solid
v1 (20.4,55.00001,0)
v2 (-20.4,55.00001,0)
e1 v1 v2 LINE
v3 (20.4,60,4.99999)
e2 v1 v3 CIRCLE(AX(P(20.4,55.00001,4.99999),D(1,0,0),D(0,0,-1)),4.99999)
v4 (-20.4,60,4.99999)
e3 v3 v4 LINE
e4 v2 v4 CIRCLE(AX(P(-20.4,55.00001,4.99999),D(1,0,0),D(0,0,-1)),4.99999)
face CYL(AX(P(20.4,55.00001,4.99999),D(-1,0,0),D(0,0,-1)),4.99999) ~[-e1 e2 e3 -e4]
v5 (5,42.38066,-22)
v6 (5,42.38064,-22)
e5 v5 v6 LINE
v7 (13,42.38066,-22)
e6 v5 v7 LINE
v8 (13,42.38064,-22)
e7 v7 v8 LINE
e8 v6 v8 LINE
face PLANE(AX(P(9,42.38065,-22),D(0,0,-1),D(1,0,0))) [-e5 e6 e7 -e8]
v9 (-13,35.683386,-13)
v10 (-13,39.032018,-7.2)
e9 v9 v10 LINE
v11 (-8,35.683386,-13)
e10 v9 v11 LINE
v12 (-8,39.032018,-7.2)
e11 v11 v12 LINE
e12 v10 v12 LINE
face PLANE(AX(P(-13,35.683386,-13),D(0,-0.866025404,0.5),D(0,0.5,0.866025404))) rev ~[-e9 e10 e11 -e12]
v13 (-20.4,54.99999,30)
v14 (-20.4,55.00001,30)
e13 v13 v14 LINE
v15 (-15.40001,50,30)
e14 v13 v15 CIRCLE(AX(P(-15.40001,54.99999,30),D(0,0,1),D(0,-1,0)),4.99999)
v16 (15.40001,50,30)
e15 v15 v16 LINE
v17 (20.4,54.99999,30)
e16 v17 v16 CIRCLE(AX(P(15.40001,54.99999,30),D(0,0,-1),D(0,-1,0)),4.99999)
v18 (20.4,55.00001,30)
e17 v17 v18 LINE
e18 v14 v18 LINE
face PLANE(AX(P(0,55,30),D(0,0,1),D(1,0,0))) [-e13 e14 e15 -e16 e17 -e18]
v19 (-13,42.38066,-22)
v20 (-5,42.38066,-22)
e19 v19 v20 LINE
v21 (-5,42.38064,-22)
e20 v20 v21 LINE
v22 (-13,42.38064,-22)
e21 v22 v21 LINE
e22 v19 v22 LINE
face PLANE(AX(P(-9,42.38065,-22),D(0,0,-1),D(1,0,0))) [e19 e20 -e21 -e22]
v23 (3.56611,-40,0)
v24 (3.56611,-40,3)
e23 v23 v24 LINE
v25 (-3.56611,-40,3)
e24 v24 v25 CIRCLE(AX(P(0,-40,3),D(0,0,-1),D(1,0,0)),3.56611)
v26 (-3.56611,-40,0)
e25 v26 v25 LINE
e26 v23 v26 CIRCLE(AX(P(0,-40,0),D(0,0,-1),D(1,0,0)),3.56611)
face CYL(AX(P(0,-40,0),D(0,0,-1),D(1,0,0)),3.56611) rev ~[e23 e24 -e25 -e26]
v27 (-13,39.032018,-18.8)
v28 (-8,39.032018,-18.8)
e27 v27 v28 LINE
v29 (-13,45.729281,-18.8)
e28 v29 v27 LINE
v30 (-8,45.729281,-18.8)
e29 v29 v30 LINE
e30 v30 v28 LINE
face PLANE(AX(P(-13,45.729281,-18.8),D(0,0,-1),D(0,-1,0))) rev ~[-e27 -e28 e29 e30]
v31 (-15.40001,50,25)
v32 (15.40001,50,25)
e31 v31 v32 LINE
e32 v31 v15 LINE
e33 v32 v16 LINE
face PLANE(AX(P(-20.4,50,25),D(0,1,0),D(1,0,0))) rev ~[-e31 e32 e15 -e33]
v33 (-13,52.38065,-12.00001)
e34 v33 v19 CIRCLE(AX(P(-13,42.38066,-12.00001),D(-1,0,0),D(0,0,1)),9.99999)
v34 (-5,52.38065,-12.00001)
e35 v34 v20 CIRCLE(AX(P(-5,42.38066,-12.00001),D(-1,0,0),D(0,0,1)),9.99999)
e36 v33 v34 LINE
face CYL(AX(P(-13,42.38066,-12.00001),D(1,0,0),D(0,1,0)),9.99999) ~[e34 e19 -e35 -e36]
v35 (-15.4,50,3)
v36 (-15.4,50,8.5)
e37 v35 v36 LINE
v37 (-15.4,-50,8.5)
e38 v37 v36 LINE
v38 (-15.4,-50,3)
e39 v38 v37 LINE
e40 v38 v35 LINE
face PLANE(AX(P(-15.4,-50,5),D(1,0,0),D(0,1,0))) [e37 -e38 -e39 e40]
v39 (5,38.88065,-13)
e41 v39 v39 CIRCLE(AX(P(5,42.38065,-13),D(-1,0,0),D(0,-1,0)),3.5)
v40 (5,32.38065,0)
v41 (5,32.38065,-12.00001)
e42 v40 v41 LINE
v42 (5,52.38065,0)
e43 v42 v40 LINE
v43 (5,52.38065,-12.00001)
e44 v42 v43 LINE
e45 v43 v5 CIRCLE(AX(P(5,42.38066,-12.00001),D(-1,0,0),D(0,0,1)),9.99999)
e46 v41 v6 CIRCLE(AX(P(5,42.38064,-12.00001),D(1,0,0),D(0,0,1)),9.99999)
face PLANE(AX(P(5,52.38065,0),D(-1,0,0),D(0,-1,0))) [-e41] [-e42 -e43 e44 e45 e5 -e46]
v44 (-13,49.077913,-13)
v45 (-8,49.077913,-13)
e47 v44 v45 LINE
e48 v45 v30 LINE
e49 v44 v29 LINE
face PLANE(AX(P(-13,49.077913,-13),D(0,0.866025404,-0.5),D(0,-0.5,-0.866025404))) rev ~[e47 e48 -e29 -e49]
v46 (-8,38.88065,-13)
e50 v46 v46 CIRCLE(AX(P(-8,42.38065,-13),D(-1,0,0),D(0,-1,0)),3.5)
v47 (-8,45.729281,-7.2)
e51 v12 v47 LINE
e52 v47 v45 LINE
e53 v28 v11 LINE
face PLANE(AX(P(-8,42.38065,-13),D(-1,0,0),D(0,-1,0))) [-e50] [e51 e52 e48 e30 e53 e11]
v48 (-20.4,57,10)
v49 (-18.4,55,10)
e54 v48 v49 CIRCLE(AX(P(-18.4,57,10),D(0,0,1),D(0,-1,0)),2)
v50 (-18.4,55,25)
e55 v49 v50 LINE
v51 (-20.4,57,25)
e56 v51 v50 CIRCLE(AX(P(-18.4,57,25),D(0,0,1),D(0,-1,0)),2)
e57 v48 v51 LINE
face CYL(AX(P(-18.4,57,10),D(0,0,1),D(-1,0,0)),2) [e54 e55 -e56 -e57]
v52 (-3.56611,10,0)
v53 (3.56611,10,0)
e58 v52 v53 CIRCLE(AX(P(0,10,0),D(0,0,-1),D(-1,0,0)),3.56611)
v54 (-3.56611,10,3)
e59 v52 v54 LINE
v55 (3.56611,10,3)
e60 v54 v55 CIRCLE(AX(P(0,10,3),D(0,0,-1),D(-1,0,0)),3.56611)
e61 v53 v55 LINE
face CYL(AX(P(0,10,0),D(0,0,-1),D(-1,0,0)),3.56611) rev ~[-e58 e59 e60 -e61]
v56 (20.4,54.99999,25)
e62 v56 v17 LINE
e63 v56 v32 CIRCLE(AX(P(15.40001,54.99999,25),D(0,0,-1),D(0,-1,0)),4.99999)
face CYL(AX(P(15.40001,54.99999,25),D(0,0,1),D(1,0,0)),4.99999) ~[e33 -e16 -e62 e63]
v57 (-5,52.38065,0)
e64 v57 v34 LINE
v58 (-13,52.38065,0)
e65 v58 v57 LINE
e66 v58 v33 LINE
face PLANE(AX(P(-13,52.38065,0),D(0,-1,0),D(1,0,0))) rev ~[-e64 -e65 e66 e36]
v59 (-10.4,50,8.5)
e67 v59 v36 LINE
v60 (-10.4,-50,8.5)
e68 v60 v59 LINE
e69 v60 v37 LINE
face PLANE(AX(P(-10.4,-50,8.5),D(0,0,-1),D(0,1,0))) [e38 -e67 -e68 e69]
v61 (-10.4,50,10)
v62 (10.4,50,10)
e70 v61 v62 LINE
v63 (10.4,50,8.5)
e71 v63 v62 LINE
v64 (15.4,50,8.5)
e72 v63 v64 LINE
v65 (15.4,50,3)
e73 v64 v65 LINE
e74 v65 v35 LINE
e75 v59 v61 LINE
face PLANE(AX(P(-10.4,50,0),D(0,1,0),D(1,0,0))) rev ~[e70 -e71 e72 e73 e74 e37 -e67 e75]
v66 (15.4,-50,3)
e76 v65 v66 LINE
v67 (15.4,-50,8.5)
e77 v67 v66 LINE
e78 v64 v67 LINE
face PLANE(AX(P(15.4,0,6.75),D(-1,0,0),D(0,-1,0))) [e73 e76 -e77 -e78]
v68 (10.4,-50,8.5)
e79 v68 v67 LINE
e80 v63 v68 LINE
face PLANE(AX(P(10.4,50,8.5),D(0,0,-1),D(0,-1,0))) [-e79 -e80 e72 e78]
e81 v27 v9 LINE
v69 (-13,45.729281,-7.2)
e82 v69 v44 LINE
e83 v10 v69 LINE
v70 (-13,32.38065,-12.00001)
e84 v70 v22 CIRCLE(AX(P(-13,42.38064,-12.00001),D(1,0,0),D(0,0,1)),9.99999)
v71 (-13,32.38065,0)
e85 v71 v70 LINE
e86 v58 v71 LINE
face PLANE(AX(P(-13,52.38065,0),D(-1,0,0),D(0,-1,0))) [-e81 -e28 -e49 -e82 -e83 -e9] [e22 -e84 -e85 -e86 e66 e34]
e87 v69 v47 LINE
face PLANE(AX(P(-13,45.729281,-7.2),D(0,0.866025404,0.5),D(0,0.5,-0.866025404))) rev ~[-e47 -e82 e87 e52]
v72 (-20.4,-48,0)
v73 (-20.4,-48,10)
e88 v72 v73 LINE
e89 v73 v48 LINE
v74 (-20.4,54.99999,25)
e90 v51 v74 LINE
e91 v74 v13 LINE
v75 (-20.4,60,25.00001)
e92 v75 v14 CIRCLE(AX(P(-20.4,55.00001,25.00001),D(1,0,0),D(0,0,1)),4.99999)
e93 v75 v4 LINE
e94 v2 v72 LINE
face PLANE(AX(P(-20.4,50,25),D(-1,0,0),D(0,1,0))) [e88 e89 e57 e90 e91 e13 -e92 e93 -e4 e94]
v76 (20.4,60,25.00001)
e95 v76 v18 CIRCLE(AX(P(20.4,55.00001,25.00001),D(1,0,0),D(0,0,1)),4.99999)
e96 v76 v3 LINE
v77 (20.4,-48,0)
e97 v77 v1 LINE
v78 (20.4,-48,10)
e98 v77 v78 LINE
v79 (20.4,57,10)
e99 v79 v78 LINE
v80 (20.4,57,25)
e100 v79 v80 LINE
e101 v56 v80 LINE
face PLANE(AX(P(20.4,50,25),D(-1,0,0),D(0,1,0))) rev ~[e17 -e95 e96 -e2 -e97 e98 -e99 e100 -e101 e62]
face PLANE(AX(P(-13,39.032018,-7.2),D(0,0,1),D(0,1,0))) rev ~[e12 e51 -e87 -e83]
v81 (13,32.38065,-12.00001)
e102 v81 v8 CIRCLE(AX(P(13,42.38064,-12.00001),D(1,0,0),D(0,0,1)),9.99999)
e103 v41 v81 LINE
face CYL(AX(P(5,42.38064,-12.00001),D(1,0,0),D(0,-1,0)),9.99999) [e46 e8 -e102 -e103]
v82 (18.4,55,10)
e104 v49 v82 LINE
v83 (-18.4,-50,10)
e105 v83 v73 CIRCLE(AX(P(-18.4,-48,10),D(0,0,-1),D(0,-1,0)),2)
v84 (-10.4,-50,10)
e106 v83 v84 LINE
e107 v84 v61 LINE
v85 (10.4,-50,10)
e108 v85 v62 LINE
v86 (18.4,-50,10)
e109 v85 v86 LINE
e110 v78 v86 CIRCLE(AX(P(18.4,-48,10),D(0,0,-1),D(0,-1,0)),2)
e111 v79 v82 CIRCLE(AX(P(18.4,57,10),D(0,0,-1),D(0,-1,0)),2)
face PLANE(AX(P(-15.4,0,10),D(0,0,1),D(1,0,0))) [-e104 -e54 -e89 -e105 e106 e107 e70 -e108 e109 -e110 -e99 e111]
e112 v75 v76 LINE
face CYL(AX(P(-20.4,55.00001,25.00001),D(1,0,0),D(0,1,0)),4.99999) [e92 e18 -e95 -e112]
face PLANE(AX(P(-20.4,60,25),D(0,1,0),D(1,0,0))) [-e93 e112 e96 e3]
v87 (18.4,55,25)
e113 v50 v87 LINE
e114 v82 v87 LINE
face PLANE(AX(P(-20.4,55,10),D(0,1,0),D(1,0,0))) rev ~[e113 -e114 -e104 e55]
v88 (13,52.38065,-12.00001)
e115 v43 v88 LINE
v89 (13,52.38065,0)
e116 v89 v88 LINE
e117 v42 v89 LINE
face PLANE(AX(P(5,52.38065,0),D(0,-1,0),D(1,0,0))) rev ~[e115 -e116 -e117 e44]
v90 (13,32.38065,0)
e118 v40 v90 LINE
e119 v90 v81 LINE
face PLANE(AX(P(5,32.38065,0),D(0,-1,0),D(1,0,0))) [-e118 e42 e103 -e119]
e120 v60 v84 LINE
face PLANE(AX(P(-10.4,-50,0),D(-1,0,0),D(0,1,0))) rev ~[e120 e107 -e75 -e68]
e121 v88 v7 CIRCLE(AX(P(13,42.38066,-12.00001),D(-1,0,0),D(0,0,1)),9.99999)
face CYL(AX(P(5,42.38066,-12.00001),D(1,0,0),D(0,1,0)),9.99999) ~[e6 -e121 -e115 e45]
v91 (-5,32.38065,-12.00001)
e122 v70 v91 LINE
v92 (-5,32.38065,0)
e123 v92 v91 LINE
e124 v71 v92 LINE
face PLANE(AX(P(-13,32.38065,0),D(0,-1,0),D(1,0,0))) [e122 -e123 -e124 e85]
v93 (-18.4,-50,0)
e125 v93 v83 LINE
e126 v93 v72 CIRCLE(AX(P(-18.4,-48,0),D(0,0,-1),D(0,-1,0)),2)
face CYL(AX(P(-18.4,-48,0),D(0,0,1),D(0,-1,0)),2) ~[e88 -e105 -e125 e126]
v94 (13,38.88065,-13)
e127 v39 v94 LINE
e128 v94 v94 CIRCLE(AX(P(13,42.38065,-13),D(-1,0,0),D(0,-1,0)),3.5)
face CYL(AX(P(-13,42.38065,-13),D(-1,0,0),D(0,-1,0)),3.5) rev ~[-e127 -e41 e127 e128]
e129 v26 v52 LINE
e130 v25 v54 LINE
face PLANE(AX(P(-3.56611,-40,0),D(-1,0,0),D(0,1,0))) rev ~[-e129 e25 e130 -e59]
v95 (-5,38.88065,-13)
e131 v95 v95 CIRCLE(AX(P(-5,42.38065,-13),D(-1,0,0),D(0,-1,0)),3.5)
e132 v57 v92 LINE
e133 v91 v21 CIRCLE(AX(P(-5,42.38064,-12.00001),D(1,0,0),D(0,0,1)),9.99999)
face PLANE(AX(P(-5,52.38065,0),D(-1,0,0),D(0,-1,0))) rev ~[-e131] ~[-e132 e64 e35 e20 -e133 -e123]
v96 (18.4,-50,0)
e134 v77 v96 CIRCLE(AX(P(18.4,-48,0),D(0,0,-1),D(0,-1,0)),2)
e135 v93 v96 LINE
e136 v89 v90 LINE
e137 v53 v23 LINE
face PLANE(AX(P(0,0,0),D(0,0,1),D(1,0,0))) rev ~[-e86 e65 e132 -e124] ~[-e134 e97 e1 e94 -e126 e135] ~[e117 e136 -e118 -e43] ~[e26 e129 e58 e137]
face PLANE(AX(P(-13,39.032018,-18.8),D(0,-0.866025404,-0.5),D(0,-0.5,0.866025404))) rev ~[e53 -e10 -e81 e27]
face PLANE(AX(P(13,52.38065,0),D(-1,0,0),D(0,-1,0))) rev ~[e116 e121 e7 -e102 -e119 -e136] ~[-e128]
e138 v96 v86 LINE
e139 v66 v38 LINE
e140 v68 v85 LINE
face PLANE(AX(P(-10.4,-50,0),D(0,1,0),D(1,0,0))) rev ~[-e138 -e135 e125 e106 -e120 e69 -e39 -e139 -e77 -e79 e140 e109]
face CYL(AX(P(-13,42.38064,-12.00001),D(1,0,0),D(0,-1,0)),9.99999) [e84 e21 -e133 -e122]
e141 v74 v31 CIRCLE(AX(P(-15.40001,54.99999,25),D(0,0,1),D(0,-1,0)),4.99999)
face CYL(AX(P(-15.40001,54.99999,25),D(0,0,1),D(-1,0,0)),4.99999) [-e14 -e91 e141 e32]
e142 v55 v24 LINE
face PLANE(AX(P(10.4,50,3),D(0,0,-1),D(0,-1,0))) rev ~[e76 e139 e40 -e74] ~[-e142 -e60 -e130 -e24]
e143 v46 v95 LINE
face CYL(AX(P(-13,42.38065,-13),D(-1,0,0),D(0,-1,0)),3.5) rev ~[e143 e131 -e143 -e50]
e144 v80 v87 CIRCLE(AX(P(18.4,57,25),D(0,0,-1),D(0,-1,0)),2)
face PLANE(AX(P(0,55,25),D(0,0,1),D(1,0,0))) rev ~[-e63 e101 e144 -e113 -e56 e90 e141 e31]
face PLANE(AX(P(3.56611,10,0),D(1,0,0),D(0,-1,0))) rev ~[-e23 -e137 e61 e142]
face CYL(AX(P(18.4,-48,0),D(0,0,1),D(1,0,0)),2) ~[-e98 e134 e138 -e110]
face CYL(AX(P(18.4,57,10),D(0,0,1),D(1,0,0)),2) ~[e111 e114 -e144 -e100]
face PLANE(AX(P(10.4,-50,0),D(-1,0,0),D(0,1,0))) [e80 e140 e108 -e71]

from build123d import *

# Parameters (mm, degrees)
F0_W      = 10
F0_H      = 100
F1_DEPTH  = 10
F0_W_2    = 20.8
F2_DEPTH  = 5
F3_W      = 40.8
F3_H      = 5
F4_DEPTH  = 15
F5_W      = 40.8
F5_H      = 10
F6_DEPTH  = 5
F7_W      = 8
F7_H      = 20
F8_DEPTH  = 22
F9_R      = 3.5
F10_DEPTH = 33.401
F11_DEPTH = 5
F12_R     = 9.99999
F13_R     = 4.99999
F14_R     = 2
F15_W     = 100
F15_H     = 3.5
F16_DEPTH = 5
F17_W     = 100
F17_H     = 3.5
F18_DEPTH = 5
F19_DEPTH = 2


# Not quite as in the source:
# - a fillet or chamfer is up to 0.001 mm smaller than in the source, because OpenCascade refuses the exact size


with BuildPart() as f1:
    # F0 (on Top) → F1 (new body)
    with BuildSketch(Plane.XY):
        with Locations((-15.4, 0)):
            Rectangle(F0_W, F0_H)
        Polygon((-10.4, 50), (10.4, 50), (20.4, 50), (20.4, 60), (-20.4, 60), (-20.4, 50), align=None)
        with Locations((15.4, 0)):
            Rectangle(F0_W, F0_H)
    extrude(amount=F1_DEPTH)

    # F0 (on Top) → F2 (join)
    with BuildSketch(Plane.XY):
        Rectangle(F0_W_2, F0_H)
        with BuildLine():
            Line((3.5661098082, 10), (3.5661098082, -40))
            ThreePointArc((3.5661098082, -40), (0, -43.5661098082), (-3.5661098082, -40))
            Line((-3.5661098082, -40), (-3.5661098082, 10))
            ThreePointArc((-3.5661098082, 10), (0, 13.5661098082), (3.5661098082, 10))
        make_face(mode=Mode.SUBTRACT)
    extrude(amount=F2_DEPTH)

    # F3 (on face) → F4 (join)
    with BuildSketch(Plane.XY.offset(10)):
        with Locations((0, 57.5)):
            Rectangle(F3_W, F3_H)
    extrude(amount=F4_DEPTH)

    # F5 (on face) → F6 (join)
    with BuildSketch(Plane.XY.offset(25)):
        with Locations((0, 55)):
            Rectangle(F5_W, F5_H)
    extrude(amount=F6_DEPTH)

    # F7 (on face) → F8 (join)
    with BuildSketch(Plane(origin=(0, 0, 0), x_dir=(1, 0, 0), z_dir=(0, 0, -1))):
        with Locations((9, -42.3806495965)):
            Rectangle(F7_W, F7_H)
        with Locations((-9, -42.3806495965)):
            Rectangle(F7_W, F7_H)
    extrude(amount=F8_DEPTH)

    # F9 (on face) → F10 (cut, through all)
    with BuildSketch(Plane(origin=(-13, 0, 0), x_dir=(0, -1, 0), z_dir=(-1, 0, 0))):
        with Locations((-42.3806495965, -13)):
            Circle(F9_R)
    extrude(amount=-F10_DEPTH, mode=Mode.SUBTRACT)

    # F9 (on face) → F11 (cut)
    with BuildSketch(Plane(origin=(-13, 0, 0), x_dir=(0, -1, 0), z_dir=(-1, 0, 0))):
        Polygon((-39.0320180352, -7.2), (-45.7292811578, -7.2), (-49.0779127191, -13), (-45.7292811578, -18.8), (-39.0320180352, -18.8), (-35.6833864739, -13), align=None)
        with Locations((-42.3806495965, -13)):
            Circle(F9_R, mode=Mode.SUBTRACT)
    extrude(amount=-F11_DEPTH, mode=Mode.SUBTRACT)

    # F12 (radius 10 in the source; OpenCascade refuses exactly that, so slightly less here)
    f12_edges = [f1.edges().sort_by_distance(p)[0] for p in [
        (-9, 52.38065, -22),
        (9, 52.38065, -22),
        (9, 32.38065, -22),
        (-9, 32.38065, -22),
    ]]
    fillet(f12_edges, radius=F12_R)

    # F13 (radius 5 in the source; OpenCascade refuses exactly that, so slightly less here)
    f13_edges = [f1.edges().sort_by_distance(p)[0] for p in [
        (-20.4, 50, 27.5),
        (20.4, 50, 27.5),
        (0, 60, 30),
        (0, 60, 0),
    ]]
    fillet(f13_edges, radius=F13_R)

    # F14
    f14_edges = [f1.edges().sort_by_distance(p)[0] for p in [
        (-20.4, 55, 17.5),
        (20.4, 55, 17.5),
        (-20.4, -50, 5),
        (20.4, -50, 5),
    ]]
    fillet(f14_edges, radius=F14_R)

    # F15 (on face) → F16 (cut)
    with BuildSketch(Plane.YZ.offset(-10.4)):
        with Locations((0, 6.75)):
            Rectangle(F15_W, F15_H)
    extrude(amount=-F16_DEPTH, mode=Mode.SUBTRACT)

    # F17 (on face) → F18 (cut)
    with BuildSketch(Plane(origin=(10.4, 0, 0), x_dir=(0, -1, 0), z_dir=(-1, 0, 0))):
        with Locations((0, 6.75)):
            Rectangle(F17_W, F17_H)
    extrude(amount=-F18_DEPTH, mode=Mode.SUBTRACT)

    # F19 (cut): a face of the model
    f19_faces = [f1.faces().sort_by_distance(p)[0] for p in [
        (0, 48.9536425085, 5),
    ]]
    extrude(f19_faces, amount=-F19_DEPTH, mode=Mode.SUBTRACT)


solid = f1.part
